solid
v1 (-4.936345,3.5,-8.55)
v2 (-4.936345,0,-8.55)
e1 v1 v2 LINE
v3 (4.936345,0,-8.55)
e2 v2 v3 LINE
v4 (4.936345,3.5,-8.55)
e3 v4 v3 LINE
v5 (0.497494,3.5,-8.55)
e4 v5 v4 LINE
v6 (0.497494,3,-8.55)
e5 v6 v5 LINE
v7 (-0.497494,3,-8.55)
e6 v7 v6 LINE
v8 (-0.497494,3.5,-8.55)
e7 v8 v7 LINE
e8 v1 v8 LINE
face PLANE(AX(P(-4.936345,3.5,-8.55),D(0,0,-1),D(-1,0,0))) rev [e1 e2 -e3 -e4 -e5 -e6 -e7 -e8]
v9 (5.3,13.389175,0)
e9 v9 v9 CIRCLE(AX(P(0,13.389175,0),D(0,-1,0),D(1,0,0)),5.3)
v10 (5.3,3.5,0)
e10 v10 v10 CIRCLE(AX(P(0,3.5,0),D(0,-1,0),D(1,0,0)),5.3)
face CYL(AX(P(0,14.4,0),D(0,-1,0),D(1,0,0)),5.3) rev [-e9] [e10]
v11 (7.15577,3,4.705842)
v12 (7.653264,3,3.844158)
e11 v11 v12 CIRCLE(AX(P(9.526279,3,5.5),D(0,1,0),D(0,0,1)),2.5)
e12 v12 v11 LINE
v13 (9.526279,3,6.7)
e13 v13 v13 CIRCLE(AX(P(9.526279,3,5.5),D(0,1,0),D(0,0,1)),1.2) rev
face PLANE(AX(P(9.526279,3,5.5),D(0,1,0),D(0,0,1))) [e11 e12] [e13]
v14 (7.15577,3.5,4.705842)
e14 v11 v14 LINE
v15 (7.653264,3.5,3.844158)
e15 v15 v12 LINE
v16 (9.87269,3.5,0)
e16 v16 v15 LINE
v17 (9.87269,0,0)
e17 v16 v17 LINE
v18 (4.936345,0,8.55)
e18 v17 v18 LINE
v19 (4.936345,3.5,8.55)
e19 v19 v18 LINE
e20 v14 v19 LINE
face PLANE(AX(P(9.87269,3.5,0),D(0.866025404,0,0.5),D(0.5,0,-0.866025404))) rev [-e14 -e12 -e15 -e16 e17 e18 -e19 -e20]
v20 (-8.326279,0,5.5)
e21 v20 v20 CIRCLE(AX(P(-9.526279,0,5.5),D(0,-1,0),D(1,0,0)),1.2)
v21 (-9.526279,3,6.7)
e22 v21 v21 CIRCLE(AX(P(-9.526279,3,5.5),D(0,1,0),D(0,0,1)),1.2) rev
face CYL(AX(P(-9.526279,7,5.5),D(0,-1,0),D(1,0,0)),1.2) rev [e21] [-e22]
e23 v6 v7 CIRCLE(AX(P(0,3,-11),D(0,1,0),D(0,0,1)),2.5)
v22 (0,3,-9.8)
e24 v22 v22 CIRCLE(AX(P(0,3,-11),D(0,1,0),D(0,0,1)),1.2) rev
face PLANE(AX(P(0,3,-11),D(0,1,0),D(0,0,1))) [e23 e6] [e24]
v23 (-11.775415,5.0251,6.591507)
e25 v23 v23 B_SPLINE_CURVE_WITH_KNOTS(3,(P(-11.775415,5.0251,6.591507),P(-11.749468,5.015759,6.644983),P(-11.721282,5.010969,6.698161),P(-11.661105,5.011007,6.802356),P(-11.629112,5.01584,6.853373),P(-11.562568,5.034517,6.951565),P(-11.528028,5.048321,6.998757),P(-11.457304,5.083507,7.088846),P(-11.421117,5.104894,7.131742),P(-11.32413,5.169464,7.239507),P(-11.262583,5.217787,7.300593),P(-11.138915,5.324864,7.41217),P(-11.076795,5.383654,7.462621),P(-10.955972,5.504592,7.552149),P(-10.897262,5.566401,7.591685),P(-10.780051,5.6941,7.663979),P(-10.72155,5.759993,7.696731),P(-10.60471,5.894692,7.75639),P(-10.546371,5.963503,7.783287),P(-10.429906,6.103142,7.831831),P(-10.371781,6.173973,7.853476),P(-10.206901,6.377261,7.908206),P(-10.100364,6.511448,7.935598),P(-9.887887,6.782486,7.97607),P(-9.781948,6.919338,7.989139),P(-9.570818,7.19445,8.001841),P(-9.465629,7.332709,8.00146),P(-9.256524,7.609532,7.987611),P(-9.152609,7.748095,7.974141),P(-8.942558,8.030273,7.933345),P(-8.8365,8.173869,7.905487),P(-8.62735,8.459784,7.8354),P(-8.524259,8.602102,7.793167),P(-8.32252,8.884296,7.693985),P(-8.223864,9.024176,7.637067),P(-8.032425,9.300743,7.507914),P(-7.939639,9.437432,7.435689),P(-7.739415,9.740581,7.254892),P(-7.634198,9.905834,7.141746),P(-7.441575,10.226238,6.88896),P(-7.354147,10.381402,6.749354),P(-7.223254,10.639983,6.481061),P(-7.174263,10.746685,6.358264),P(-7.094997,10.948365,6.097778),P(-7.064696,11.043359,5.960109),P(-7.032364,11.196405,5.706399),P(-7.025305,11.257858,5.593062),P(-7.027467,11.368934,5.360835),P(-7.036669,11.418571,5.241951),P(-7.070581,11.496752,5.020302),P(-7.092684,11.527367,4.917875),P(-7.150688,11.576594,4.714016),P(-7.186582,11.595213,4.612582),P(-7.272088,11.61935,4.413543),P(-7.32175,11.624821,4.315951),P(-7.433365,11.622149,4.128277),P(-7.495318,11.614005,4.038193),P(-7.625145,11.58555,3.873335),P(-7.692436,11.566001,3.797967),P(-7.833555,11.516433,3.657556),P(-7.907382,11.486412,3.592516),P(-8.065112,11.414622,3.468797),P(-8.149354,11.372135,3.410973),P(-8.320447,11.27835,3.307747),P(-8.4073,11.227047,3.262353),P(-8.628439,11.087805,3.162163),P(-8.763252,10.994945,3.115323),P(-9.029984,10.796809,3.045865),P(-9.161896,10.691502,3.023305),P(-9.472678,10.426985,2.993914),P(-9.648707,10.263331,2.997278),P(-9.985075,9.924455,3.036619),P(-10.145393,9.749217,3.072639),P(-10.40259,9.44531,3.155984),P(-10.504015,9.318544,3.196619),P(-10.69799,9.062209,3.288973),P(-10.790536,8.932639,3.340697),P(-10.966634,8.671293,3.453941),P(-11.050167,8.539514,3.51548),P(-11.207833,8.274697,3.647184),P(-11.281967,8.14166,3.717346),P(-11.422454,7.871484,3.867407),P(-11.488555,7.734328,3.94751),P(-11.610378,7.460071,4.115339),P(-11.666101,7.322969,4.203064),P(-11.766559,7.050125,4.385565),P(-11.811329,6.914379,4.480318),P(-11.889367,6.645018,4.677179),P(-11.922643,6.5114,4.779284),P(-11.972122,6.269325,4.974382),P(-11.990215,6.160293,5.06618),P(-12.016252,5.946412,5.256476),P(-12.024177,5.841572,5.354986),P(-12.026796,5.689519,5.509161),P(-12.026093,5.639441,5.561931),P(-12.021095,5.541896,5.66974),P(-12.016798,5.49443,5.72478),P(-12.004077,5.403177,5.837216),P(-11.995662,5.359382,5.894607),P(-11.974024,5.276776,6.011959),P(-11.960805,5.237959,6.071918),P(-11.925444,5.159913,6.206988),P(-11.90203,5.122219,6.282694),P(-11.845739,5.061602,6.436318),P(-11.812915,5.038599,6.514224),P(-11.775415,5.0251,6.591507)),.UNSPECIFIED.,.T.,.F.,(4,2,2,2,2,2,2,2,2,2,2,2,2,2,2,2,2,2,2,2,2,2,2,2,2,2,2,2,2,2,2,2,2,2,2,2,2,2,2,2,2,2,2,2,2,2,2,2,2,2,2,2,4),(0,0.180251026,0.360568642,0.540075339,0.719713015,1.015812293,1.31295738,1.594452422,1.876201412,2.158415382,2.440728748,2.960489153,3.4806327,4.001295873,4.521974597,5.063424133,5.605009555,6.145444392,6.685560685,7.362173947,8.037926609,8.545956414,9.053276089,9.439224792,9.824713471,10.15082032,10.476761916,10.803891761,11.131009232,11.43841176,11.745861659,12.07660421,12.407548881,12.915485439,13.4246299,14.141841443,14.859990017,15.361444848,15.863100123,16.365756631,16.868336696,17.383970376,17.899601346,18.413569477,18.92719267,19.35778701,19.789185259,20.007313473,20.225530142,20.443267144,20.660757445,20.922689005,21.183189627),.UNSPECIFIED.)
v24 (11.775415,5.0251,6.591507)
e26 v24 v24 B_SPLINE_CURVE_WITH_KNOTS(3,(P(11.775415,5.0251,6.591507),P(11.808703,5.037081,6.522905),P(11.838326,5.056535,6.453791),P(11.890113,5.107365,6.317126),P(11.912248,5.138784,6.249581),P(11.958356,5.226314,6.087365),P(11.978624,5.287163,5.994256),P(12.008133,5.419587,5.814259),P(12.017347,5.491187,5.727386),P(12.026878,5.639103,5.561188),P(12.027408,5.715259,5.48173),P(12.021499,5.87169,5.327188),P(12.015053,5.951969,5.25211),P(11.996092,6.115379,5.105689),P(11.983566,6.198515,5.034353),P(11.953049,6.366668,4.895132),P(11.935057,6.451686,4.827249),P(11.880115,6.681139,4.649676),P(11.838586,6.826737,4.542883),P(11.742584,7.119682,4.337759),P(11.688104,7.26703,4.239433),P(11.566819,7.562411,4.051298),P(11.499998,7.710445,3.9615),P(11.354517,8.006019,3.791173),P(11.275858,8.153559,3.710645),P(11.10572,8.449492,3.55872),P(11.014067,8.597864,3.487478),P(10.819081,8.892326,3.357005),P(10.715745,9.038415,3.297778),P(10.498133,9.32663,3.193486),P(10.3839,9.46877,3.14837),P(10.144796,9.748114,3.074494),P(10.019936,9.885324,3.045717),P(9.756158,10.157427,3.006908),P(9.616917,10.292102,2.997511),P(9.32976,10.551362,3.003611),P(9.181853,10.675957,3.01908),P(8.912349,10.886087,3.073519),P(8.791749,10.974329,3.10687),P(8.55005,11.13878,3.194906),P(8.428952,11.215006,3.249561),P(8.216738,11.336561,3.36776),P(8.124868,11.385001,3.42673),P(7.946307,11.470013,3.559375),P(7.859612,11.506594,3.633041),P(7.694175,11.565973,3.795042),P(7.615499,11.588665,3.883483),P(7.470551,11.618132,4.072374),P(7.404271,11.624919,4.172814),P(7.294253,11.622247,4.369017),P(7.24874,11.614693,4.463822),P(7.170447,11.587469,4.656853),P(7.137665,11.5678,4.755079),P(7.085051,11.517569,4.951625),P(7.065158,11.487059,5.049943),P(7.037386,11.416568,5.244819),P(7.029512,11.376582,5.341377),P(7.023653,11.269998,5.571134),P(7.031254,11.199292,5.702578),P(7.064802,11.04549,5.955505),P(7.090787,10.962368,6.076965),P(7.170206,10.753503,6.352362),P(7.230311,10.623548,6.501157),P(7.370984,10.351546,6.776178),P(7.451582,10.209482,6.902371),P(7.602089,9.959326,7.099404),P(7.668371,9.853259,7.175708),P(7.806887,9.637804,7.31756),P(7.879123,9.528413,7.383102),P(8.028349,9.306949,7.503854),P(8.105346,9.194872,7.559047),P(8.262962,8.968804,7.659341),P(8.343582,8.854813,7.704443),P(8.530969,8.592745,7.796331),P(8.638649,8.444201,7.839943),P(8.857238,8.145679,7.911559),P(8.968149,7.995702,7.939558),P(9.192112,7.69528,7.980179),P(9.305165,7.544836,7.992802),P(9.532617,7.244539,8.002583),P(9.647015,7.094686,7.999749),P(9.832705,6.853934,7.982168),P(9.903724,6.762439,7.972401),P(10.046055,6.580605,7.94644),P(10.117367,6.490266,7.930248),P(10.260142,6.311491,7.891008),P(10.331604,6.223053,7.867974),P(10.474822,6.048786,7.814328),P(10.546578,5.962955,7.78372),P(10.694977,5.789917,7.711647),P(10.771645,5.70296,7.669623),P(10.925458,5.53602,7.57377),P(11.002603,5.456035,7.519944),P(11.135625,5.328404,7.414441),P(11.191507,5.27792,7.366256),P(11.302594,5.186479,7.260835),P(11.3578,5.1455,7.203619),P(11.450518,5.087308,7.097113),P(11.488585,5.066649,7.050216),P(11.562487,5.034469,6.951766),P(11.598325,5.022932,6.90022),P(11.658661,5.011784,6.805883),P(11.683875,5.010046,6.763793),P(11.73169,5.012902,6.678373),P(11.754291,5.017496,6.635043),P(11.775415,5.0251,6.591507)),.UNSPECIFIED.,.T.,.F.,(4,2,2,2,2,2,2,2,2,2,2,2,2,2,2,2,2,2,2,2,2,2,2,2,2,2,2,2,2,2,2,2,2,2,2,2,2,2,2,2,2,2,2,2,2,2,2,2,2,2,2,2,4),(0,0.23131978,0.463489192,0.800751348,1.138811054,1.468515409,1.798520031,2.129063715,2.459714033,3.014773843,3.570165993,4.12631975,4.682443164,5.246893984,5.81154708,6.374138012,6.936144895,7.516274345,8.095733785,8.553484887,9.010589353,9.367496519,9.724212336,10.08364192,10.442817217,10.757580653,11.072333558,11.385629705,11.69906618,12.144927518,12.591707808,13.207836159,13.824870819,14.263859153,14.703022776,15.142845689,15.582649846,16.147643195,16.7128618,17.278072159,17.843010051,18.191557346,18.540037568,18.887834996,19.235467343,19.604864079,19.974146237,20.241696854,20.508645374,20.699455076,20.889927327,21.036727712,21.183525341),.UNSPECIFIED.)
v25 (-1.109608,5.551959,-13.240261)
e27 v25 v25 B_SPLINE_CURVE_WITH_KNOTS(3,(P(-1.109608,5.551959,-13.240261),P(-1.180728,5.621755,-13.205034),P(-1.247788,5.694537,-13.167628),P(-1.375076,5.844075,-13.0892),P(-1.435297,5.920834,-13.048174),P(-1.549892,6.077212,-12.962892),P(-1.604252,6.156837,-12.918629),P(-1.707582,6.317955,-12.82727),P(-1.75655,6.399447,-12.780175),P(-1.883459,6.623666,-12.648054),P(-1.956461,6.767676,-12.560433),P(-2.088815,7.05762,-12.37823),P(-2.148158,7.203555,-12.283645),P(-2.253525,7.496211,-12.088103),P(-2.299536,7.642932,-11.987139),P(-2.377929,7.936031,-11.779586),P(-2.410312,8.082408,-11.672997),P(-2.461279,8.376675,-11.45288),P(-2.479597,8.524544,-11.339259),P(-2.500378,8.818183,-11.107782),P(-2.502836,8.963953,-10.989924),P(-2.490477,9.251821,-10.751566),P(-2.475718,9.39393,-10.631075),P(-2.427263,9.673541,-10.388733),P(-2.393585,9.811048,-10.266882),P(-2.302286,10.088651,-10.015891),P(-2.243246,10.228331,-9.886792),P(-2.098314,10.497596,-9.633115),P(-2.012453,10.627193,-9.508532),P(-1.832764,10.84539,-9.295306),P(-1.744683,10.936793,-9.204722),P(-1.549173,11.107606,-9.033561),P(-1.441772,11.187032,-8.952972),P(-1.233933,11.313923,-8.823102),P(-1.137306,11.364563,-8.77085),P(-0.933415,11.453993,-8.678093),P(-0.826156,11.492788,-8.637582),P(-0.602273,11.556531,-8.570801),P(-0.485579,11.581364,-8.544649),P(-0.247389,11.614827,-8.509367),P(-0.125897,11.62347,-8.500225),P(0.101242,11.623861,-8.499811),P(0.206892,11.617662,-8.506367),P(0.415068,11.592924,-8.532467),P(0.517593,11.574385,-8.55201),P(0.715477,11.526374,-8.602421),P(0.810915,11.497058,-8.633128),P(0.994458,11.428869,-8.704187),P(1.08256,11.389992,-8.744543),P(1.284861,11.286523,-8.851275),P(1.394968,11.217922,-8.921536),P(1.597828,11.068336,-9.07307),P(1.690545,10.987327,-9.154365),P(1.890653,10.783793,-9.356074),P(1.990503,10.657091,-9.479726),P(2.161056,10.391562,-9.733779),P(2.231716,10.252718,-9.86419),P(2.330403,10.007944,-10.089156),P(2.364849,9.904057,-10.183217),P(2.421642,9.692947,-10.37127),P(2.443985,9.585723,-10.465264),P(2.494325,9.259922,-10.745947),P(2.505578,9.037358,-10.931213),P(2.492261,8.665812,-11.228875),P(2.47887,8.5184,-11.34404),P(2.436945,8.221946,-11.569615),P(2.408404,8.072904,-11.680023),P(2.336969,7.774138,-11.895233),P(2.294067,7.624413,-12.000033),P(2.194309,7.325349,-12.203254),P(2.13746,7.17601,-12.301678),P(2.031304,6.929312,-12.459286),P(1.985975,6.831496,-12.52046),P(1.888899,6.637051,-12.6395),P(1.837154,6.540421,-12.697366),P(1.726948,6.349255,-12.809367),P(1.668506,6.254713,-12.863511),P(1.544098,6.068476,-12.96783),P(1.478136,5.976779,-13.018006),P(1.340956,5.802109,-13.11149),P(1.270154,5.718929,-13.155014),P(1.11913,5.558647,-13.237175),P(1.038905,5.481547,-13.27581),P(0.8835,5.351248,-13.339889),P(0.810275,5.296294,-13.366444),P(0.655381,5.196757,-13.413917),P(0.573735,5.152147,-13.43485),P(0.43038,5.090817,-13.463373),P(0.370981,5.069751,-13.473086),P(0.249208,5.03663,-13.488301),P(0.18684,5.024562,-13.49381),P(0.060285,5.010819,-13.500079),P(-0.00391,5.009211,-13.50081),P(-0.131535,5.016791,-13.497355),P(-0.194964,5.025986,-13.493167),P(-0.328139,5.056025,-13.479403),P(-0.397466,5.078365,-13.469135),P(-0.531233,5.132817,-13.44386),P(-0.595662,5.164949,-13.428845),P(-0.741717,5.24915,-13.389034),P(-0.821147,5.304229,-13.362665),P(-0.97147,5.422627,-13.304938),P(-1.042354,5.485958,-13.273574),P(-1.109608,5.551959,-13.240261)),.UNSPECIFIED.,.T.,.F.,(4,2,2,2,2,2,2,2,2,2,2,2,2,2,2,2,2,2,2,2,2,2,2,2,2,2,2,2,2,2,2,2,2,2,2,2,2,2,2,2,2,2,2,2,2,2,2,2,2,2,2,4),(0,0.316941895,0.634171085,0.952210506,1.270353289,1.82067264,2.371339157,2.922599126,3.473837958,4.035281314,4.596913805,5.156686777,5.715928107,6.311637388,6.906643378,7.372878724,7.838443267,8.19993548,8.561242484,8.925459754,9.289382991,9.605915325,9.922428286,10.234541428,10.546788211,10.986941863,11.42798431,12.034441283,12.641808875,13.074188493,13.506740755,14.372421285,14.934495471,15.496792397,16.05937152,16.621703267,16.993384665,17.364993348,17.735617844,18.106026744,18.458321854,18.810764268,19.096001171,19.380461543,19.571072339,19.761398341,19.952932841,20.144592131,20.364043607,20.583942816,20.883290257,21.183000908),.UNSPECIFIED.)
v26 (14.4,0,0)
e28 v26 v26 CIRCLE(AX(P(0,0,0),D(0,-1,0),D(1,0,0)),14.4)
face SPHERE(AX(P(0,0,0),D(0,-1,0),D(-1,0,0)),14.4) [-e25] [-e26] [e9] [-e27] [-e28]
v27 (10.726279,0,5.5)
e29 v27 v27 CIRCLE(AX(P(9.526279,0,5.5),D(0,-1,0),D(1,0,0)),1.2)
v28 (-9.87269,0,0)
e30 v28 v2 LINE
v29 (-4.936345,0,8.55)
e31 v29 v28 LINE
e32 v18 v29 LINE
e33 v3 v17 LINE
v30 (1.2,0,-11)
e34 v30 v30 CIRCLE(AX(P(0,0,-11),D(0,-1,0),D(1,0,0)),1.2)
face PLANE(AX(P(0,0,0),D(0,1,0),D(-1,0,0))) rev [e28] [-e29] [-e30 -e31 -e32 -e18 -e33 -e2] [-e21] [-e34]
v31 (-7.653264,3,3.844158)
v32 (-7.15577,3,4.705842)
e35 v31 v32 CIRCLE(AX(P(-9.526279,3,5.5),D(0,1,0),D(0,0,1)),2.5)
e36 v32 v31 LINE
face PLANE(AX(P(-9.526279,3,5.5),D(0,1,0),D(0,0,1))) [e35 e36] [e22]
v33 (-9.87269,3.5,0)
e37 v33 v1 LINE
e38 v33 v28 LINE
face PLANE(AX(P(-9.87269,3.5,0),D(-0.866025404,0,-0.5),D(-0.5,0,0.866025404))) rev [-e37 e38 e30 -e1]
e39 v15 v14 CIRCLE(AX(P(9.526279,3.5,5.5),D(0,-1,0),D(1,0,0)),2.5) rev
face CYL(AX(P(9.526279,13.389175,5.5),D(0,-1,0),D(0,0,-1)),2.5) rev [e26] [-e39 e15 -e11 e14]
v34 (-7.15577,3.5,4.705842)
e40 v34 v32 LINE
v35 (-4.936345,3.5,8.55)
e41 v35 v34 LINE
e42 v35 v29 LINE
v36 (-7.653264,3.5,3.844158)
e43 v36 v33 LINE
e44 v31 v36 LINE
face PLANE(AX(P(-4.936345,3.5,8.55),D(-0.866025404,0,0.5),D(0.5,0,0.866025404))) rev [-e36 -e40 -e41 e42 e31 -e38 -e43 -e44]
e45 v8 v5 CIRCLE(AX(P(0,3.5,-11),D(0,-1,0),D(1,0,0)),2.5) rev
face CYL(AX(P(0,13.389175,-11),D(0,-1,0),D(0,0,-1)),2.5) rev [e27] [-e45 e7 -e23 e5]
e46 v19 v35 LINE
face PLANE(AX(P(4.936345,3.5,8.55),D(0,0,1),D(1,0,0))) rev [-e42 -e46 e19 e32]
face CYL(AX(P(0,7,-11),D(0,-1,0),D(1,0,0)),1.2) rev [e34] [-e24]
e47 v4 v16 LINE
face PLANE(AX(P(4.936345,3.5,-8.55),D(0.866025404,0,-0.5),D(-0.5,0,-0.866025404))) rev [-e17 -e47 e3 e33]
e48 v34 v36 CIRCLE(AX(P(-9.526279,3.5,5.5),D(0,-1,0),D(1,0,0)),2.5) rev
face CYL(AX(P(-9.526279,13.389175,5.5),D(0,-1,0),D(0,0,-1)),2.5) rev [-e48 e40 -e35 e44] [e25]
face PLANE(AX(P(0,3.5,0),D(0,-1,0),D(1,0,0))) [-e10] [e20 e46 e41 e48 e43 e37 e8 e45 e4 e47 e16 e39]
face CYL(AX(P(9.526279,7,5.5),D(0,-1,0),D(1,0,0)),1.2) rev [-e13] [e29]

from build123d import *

# Parameters (mm, degrees)
CUT_EXTRUDE2_DEPTH = 3.5
SKETCH7_R          = 1.2
CUT_EXTRUDE6_DEPTH = 7
SKETCH3_R          = 5.3
CUT_EXTRUDE7_DEPTH = 24.098268333
CUT_EXTRUDE8_START = 3
SKETCH8_R          = 2.5
CUT_EXTRUDE8_DEPTH = 22.371910061


with BuildPart() as part:
    # Sketch1 → Revolve1 (revolve)
    with BuildSketch(Plane.XY):
        with BuildLine():
            ThreePointArc((0, 14.4), (-10.182337649, 10.182337649), (-14.4, 0))
            Line((-14.4, 0), (0, 0))
            Line((0, 0), (0, 14.4))
        make_face()
    revolve(axis=Axis((0, -1000, 0), (0, 1, 0)))

    # Sketch2 → Cut-Extrude2 (cut)
    with BuildSketch(Plane.XZ):
        Polygon((4.936344802, -8.55), (9.872689603, 0), (4.936344802, 8.55), (-4.936344802, 8.55), (-9.872689603, 0), (-4.936344802, -8.55), align=None)
    extrude(amount=-CUT_EXTRUDE2_DEPTH, mode=Mode.SUBTRACT)

    # Sketch7 → Cut-Extrude6 (cut)
    with BuildSketch(Plane.XZ):
        with Locations((-9.526279442, 5.5)):
            Circle(SKETCH7_R)
        with Locations((9.526279442, 5.5)):
            Circle(SKETCH7_R)
        with Locations((0, -11)):
            Circle(SKETCH7_R)
    extrude(amount=-CUT_EXTRUDE6_DEPTH, mode=Mode.SUBTRACT)

    # Sketch3 → Cut-Extrude7 (cut, through all)
    with BuildSketch(Plane.XZ.offset(-3.5)):
        Circle(SKETCH3_R)
    extrude(amount=-CUT_EXTRUDE7_DEPTH, mode=Mode.SUBTRACT)

    # Sketch8 → Cut-Extrude8 (cut, through all)
    with BuildSketch(Plane(origin=(0, 0, 0), x_dir=(1, 0, 0), z_dir=(0, 1, 0)).offset(CUT_EXTRUDE8_START)):
        with Locations((-9.526279442, -5.5)):
            Circle(SKETCH8_R)
        with Locations((0, 11)):
            Circle(SKETCH8_R)
        with Locations((9.526279442, -5.5)):
            Circle(SKETCH8_R)
    extrude(amount=CUT_EXTRUDE8_DEPTH, mode=Mode.SUBTRACT)


solid = part.part
